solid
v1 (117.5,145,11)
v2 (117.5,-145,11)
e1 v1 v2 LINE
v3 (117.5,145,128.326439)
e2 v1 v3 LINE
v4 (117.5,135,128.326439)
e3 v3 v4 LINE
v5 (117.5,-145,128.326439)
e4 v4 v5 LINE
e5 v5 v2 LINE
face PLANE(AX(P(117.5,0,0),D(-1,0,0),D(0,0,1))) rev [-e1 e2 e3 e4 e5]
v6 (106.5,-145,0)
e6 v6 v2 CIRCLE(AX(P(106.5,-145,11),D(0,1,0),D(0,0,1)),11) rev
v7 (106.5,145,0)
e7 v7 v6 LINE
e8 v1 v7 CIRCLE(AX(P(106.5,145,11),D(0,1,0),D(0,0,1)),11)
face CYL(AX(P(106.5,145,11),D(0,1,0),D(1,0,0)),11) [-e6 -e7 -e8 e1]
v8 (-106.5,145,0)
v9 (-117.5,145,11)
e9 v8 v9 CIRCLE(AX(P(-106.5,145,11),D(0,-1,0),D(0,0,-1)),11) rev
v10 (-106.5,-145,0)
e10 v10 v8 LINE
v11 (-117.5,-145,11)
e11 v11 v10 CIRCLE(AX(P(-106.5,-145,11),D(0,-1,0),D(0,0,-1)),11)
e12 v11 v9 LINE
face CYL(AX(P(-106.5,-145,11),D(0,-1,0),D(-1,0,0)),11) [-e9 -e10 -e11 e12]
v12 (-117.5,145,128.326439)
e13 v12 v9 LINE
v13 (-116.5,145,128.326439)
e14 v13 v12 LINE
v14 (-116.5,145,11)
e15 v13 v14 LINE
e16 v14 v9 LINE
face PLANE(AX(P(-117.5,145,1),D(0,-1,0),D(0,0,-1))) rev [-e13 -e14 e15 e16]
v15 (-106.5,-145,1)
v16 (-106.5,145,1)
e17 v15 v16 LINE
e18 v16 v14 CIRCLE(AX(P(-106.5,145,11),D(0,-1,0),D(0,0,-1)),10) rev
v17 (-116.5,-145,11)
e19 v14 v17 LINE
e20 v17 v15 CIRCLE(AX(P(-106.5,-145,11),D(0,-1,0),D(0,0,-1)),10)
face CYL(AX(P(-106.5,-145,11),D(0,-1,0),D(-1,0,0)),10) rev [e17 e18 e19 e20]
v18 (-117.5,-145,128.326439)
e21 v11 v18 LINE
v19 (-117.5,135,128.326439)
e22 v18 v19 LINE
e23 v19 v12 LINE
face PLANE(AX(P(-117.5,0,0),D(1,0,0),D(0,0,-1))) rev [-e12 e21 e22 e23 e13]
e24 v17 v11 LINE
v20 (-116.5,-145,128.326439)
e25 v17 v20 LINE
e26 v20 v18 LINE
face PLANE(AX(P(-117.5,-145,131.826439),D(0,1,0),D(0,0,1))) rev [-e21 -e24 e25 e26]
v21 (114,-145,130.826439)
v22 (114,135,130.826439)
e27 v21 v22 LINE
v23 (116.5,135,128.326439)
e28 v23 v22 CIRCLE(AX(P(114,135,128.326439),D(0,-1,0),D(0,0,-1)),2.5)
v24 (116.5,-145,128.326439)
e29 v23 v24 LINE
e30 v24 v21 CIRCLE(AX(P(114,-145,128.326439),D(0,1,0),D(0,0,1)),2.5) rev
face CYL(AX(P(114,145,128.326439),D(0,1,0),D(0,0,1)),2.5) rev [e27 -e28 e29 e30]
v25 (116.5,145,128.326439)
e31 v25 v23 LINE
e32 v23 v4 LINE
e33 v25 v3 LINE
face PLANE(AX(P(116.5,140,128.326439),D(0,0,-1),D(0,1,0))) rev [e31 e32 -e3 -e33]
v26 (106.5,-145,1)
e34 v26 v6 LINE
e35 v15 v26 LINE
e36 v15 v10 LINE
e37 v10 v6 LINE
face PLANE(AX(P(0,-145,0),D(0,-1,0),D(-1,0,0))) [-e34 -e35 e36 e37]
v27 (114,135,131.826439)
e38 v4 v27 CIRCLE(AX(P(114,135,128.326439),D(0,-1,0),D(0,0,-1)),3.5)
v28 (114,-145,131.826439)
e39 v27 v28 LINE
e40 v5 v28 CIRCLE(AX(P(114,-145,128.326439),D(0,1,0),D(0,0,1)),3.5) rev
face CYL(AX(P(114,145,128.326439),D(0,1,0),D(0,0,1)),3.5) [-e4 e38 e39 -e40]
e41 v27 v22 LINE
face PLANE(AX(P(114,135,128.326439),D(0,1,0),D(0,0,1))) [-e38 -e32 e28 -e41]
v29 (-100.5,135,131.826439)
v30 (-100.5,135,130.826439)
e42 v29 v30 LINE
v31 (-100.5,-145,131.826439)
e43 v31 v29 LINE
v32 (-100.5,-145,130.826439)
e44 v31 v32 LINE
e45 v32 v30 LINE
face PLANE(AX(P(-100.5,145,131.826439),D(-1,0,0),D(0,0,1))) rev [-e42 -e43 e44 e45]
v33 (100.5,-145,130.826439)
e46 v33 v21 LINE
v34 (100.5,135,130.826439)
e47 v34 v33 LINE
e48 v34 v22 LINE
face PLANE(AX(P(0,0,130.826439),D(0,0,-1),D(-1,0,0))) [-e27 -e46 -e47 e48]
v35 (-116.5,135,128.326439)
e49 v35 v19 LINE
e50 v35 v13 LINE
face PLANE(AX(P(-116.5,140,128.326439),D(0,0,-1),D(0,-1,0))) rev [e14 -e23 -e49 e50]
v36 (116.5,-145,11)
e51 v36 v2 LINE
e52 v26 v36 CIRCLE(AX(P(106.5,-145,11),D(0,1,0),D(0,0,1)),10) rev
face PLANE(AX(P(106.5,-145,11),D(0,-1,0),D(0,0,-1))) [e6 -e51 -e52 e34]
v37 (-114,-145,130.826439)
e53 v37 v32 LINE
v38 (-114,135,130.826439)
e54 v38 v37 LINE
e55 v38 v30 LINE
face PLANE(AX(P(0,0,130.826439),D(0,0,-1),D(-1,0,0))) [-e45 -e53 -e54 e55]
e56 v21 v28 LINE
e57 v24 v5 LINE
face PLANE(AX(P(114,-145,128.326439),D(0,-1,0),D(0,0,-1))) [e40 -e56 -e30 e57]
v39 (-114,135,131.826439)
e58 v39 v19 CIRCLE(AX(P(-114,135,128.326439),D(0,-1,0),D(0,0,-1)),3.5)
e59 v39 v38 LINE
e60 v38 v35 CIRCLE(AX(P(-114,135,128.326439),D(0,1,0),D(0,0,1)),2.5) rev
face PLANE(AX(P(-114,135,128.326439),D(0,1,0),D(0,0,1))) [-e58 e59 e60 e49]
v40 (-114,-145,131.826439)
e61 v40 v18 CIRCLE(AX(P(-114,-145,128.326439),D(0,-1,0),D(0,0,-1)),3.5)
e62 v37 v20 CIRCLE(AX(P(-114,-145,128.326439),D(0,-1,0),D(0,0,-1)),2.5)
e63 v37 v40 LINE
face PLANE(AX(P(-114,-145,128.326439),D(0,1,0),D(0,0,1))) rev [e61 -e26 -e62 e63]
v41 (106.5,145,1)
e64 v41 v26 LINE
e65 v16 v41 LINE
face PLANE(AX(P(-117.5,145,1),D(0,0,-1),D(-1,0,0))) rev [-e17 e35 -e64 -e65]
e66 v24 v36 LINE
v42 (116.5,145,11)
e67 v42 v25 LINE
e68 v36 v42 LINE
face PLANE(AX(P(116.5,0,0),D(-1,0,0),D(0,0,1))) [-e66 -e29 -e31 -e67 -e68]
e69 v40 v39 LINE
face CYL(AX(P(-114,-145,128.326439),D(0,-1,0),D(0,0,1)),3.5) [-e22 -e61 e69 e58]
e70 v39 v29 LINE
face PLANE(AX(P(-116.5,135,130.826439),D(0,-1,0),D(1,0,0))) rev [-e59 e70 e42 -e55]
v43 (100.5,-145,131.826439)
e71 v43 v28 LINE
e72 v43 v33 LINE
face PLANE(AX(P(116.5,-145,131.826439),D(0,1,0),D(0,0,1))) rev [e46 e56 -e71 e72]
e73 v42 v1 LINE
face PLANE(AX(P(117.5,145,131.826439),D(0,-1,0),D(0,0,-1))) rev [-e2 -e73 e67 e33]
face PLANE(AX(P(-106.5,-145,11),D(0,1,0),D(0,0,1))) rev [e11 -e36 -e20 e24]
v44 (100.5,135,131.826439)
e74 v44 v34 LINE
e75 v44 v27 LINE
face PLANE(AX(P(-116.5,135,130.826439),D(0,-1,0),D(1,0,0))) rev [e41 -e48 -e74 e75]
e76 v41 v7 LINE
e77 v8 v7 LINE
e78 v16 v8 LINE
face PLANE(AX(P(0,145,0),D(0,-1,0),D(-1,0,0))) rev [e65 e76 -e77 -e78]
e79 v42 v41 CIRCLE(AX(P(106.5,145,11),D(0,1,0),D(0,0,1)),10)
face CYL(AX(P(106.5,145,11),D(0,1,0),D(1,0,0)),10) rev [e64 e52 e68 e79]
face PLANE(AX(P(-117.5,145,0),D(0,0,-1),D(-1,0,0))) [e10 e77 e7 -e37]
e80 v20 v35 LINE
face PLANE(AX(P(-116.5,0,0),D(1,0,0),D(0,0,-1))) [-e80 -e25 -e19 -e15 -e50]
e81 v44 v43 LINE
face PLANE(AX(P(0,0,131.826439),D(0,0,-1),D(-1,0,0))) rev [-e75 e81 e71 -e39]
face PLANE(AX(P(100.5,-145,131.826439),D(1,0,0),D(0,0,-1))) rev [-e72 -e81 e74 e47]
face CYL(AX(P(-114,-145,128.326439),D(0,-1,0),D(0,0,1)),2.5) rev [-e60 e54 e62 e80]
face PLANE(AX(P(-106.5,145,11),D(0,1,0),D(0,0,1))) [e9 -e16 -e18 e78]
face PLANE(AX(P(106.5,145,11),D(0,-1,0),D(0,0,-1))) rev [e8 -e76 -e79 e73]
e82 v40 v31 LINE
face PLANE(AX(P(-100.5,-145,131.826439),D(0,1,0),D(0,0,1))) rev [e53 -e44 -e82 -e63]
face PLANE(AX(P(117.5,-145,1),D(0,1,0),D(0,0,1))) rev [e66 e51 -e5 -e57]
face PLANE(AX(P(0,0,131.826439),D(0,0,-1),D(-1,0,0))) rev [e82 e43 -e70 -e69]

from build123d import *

# Parameters (mm, degrees)
SKETCH1_W                      = 235
SKETCH1_H                      = 1
BASE_FLANGE1_DEPTH             = 145
EDGE_FLANGE2_STRIP_W           = 24
EDGE_FLANGE2_STRIP_H           = 1
EDGE_FLANGE2_STRIP_CUT_DEPTH   = 290
EDGE_FLANGE2_STRIP_2_W         = 24
EDGE_FLANGE2_STRIP_2_H         = 1
EDGE_FLANGE2_STRIP_CUT_2_DEPTH = 290
EDGE_FLANGE2_DEPTH             = 290
EDGE_FLANGE2_BEND_DEPTH        = 290
EDGE_FLANGE3_STRIP_W           = 9
EDGE_FLANGE3_STRIP_H           = 1
EDGE_FLANGE3_STRIP_CUT_DEPTH   = 290
EDGE_FLANGE3_STRIP_2_W         = 9
EDGE_FLANGE3_STRIP_2_H         = 1
EDGE_FLANGE3_STRIP_CUT_2_DEPTH = 290
EDGE_FLANGE3_DEPTH             = 290
EDGE_FLANGE3_BEND_DEPTH        = 290
CUT_EXTRUDE1_START             = -10
CUT_EXTRUDE1_DEPTH             = 10


# Read off the part's stored shape, not the designer's step: Cut-Extrude1
# Sheet-metal steps are written as plain solids
with BuildPart() as part:
    # Sketch1 → Base-Flange1 (new, symmetric)
    with BuildSketch(Plane(origin=(0, 0, 0), x_dir=(1, 0, 0), z_dir=(0, 1, 0))):
        with Locations((0, -0.5)):
            Rectangle(SKETCH1_W, SKETCH1_H)
    extrude(amount=BASE_FLANGE1_DEPTH, both=True)

    # Edge-Flange2 strip (across the edge) → Edge-Flange2 strip cut (cut)
    with BuildSketch(Plane(origin=(-117.5, 145, 1), x_dir=(1, 0, 0), z_dir=(0, -1, 0))):
        with Locations((-1, -0.5)):
            Rectangle(EDGE_FLANGE2_STRIP_W, EDGE_FLANGE2_STRIP_H)
    extrude(amount=EDGE_FLANGE2_STRIP_CUT_DEPTH, mode=Mode.SUBTRACT)

    # Edge-Flange2 strip 2 (across the edge) → Edge-Flange2 strip cut 2 (cut)
    with BuildSketch(Plane(origin=(117.5, -145, 1), x_dir=(-1, 0, 0), z_dir=(0, 1, 0))):
        with Locations((-1, -0.5)):
            Rectangle(EDGE_FLANGE2_STRIP_2_W, EDGE_FLANGE2_STRIP_2_H)
    extrude(amount=EDGE_FLANGE2_STRIP_CUT_2_DEPTH, mode=Mode.SUBTRACT)

    # Edge-Flange2 section (across the edge) → Edge-Flange2 (add)
    with BuildSketch(Plane(origin=(-117.5, 145, 1), x_dir=(1, 0, 0), z_dir=(0, -1, 0))):
        with BuildLine():
            Line((0, 10), (0, 130.826439119))
            Line((0, 130.826439119), (1, 130.826439119))
            Line((1, 130.826439119), (1, 10))
            ThreePointArc((1, 10), (3.928932188, 2.928932188), (11, 0))
            Line((11, 0), (11, -1))
            ThreePointArc((11, -1), (3.221825407, 2.221825407), (0, 10))
        make_face()
    extrude(amount=EDGE_FLANGE2_DEPTH)

    # Edge-Flange2 section 2 (across the edge) → Edge-Flange2 bend (add)
    with BuildSketch(Plane(origin=(117.5, -145, 1), x_dir=(-1, 0, 0), z_dir=(0, 1, 0))):
        with BuildLine():
            Line((0, 10), (0, 130.826439119))
            Line((0, 130.826439119), (1, 130.826439119))
            Line((1, 130.826439119), (1, 10))
            ThreePointArc((1, 10), (3.928932188, 2.928932188), (11, 0))
            Line((11, 0), (11, -1))
            ThreePointArc((11, -1), (3.221825407, 2.221825407), (0, 10))
        make_face()
    extrude(amount=EDGE_FLANGE2_BEND_DEPTH)

    # Edge-Flange3 strip (across the edge) → Edge-Flange3 strip cut (cut)
    with BuildSketch(Plane(origin=(-116.5, 145, 131.826439119), x_dir=(0, 0, -1), z_dir=(0, -1, 0))):
        with Locations((-1, -0.5)):
            Rectangle(EDGE_FLANGE3_STRIP_W, EDGE_FLANGE3_STRIP_H)
    extrude(amount=EDGE_FLANGE3_STRIP_CUT_DEPTH, mode=Mode.SUBTRACT)

    # Edge-Flange3 strip 2 (across the edge) → Edge-Flange3 strip cut 2 (cut)
    with BuildSketch(Plane(origin=(116.5, -145, 131.826439119), x_dir=(0, 0, -1), z_dir=(0, 1, 0))):
        with Locations((-1, -0.5)):
            Rectangle(EDGE_FLANGE3_STRIP_2_W, EDGE_FLANGE3_STRIP_2_H)
    extrude(amount=EDGE_FLANGE3_STRIP_CUT_2_DEPTH, mode=Mode.SUBTRACT)

    # Edge-Flange3 section (across the edge) → Edge-Flange3 (add)
    with BuildSketch(Plane(origin=(-116.5, 145, 131.826439119), x_dir=(0, 0, -1), z_dir=(0, -1, 0))):
        with BuildLine():
            Line((0, 2.5), (0, 16))
            Line((0, 16), (1, 16))
            Line((1, 16), (1, 2.5))
            ThreePointArc((1, 2.5), (1.732233047, 0.732233047), (3.5, 0))
            Line((3.5, 0), (3.5, -1))
            ThreePointArc((3.5, -1), (1.025126266, 0.025126266), (0, 2.5))
        make_face()
    extrude(amount=EDGE_FLANGE3_DEPTH)

    # Edge-Flange3 section 2 (across the edge) → Edge-Flange3 bend (add)
    with BuildSketch(Plane(origin=(116.5, -145, 131.826439119), x_dir=(0, 0, -1), z_dir=(0, 1, 0))):
        with BuildLine():
            Line((0, 2.5), (0, 16))
            Line((0, 16), (1, 16))
            Line((1, 16), (1, 2.5))
            ThreePointArc((1, 2.5), (1.732233047, 0.732233047), (3.5, 0))
            Line((3.5, 0), (3.5, -1))
            ThreePointArc((3.5, -1), (1.025126266, 0.025126266), (0, 2.5))
        make_face()
    extrude(amount=EDGE_FLANGE3_BEND_DEPTH)

    # Cut-Extrude1 outline → Cut-Extrude1 (cut)
    with BuildSketch(Plane(origin=(0, 145, 0), x_dir=(1, 0, 0), z_dir=(0, 1, 0)).offset(CUT_EXTRUDE1_START)):
        with BuildLine():
            ThreePointArc((114, -131.826439119), (116.474873734, -130.801312853), (117.5, -128.326439119))
            Line((117.5, -128.326439119), (116.5, -128.326439119))
            ThreePointArc((116.5, -128.326439119), (115.767766953, -130.094206072), (114, -130.826439119))
            Line((114, -130.826439119), (100.5, -130.826439119))
            Line((100.5, -130.826439119), (100.5, -131.826439119))
            Line((100.5, -131.826439119), (114, -131.826439119))
        make_face()
        with BuildLine():
            ThreePointArc((-114, -130.826439119), (-115.767766953, -130.094206072), (-116.5, -128.326439119))
            Line((-116.5, -128.326439119), (-117.5, -128.326439119))
            ThreePointArc((-117.5, -128.326439119), (-116.474873734, -130.801312853), (-114, -131.826439119))
            Line((-114, -131.826439119), (-100.5, -131.826439119))
            Line((-100.5, -131.826439119), (-100.5, -130.826439119))
            Line((-100.5, -130.826439119), (-114, -130.826439119))
        make_face()
    extrude(amount=CUT_EXTRUDE1_DEPTH, mode=Mode.SUBTRACT)


solid = part.part
